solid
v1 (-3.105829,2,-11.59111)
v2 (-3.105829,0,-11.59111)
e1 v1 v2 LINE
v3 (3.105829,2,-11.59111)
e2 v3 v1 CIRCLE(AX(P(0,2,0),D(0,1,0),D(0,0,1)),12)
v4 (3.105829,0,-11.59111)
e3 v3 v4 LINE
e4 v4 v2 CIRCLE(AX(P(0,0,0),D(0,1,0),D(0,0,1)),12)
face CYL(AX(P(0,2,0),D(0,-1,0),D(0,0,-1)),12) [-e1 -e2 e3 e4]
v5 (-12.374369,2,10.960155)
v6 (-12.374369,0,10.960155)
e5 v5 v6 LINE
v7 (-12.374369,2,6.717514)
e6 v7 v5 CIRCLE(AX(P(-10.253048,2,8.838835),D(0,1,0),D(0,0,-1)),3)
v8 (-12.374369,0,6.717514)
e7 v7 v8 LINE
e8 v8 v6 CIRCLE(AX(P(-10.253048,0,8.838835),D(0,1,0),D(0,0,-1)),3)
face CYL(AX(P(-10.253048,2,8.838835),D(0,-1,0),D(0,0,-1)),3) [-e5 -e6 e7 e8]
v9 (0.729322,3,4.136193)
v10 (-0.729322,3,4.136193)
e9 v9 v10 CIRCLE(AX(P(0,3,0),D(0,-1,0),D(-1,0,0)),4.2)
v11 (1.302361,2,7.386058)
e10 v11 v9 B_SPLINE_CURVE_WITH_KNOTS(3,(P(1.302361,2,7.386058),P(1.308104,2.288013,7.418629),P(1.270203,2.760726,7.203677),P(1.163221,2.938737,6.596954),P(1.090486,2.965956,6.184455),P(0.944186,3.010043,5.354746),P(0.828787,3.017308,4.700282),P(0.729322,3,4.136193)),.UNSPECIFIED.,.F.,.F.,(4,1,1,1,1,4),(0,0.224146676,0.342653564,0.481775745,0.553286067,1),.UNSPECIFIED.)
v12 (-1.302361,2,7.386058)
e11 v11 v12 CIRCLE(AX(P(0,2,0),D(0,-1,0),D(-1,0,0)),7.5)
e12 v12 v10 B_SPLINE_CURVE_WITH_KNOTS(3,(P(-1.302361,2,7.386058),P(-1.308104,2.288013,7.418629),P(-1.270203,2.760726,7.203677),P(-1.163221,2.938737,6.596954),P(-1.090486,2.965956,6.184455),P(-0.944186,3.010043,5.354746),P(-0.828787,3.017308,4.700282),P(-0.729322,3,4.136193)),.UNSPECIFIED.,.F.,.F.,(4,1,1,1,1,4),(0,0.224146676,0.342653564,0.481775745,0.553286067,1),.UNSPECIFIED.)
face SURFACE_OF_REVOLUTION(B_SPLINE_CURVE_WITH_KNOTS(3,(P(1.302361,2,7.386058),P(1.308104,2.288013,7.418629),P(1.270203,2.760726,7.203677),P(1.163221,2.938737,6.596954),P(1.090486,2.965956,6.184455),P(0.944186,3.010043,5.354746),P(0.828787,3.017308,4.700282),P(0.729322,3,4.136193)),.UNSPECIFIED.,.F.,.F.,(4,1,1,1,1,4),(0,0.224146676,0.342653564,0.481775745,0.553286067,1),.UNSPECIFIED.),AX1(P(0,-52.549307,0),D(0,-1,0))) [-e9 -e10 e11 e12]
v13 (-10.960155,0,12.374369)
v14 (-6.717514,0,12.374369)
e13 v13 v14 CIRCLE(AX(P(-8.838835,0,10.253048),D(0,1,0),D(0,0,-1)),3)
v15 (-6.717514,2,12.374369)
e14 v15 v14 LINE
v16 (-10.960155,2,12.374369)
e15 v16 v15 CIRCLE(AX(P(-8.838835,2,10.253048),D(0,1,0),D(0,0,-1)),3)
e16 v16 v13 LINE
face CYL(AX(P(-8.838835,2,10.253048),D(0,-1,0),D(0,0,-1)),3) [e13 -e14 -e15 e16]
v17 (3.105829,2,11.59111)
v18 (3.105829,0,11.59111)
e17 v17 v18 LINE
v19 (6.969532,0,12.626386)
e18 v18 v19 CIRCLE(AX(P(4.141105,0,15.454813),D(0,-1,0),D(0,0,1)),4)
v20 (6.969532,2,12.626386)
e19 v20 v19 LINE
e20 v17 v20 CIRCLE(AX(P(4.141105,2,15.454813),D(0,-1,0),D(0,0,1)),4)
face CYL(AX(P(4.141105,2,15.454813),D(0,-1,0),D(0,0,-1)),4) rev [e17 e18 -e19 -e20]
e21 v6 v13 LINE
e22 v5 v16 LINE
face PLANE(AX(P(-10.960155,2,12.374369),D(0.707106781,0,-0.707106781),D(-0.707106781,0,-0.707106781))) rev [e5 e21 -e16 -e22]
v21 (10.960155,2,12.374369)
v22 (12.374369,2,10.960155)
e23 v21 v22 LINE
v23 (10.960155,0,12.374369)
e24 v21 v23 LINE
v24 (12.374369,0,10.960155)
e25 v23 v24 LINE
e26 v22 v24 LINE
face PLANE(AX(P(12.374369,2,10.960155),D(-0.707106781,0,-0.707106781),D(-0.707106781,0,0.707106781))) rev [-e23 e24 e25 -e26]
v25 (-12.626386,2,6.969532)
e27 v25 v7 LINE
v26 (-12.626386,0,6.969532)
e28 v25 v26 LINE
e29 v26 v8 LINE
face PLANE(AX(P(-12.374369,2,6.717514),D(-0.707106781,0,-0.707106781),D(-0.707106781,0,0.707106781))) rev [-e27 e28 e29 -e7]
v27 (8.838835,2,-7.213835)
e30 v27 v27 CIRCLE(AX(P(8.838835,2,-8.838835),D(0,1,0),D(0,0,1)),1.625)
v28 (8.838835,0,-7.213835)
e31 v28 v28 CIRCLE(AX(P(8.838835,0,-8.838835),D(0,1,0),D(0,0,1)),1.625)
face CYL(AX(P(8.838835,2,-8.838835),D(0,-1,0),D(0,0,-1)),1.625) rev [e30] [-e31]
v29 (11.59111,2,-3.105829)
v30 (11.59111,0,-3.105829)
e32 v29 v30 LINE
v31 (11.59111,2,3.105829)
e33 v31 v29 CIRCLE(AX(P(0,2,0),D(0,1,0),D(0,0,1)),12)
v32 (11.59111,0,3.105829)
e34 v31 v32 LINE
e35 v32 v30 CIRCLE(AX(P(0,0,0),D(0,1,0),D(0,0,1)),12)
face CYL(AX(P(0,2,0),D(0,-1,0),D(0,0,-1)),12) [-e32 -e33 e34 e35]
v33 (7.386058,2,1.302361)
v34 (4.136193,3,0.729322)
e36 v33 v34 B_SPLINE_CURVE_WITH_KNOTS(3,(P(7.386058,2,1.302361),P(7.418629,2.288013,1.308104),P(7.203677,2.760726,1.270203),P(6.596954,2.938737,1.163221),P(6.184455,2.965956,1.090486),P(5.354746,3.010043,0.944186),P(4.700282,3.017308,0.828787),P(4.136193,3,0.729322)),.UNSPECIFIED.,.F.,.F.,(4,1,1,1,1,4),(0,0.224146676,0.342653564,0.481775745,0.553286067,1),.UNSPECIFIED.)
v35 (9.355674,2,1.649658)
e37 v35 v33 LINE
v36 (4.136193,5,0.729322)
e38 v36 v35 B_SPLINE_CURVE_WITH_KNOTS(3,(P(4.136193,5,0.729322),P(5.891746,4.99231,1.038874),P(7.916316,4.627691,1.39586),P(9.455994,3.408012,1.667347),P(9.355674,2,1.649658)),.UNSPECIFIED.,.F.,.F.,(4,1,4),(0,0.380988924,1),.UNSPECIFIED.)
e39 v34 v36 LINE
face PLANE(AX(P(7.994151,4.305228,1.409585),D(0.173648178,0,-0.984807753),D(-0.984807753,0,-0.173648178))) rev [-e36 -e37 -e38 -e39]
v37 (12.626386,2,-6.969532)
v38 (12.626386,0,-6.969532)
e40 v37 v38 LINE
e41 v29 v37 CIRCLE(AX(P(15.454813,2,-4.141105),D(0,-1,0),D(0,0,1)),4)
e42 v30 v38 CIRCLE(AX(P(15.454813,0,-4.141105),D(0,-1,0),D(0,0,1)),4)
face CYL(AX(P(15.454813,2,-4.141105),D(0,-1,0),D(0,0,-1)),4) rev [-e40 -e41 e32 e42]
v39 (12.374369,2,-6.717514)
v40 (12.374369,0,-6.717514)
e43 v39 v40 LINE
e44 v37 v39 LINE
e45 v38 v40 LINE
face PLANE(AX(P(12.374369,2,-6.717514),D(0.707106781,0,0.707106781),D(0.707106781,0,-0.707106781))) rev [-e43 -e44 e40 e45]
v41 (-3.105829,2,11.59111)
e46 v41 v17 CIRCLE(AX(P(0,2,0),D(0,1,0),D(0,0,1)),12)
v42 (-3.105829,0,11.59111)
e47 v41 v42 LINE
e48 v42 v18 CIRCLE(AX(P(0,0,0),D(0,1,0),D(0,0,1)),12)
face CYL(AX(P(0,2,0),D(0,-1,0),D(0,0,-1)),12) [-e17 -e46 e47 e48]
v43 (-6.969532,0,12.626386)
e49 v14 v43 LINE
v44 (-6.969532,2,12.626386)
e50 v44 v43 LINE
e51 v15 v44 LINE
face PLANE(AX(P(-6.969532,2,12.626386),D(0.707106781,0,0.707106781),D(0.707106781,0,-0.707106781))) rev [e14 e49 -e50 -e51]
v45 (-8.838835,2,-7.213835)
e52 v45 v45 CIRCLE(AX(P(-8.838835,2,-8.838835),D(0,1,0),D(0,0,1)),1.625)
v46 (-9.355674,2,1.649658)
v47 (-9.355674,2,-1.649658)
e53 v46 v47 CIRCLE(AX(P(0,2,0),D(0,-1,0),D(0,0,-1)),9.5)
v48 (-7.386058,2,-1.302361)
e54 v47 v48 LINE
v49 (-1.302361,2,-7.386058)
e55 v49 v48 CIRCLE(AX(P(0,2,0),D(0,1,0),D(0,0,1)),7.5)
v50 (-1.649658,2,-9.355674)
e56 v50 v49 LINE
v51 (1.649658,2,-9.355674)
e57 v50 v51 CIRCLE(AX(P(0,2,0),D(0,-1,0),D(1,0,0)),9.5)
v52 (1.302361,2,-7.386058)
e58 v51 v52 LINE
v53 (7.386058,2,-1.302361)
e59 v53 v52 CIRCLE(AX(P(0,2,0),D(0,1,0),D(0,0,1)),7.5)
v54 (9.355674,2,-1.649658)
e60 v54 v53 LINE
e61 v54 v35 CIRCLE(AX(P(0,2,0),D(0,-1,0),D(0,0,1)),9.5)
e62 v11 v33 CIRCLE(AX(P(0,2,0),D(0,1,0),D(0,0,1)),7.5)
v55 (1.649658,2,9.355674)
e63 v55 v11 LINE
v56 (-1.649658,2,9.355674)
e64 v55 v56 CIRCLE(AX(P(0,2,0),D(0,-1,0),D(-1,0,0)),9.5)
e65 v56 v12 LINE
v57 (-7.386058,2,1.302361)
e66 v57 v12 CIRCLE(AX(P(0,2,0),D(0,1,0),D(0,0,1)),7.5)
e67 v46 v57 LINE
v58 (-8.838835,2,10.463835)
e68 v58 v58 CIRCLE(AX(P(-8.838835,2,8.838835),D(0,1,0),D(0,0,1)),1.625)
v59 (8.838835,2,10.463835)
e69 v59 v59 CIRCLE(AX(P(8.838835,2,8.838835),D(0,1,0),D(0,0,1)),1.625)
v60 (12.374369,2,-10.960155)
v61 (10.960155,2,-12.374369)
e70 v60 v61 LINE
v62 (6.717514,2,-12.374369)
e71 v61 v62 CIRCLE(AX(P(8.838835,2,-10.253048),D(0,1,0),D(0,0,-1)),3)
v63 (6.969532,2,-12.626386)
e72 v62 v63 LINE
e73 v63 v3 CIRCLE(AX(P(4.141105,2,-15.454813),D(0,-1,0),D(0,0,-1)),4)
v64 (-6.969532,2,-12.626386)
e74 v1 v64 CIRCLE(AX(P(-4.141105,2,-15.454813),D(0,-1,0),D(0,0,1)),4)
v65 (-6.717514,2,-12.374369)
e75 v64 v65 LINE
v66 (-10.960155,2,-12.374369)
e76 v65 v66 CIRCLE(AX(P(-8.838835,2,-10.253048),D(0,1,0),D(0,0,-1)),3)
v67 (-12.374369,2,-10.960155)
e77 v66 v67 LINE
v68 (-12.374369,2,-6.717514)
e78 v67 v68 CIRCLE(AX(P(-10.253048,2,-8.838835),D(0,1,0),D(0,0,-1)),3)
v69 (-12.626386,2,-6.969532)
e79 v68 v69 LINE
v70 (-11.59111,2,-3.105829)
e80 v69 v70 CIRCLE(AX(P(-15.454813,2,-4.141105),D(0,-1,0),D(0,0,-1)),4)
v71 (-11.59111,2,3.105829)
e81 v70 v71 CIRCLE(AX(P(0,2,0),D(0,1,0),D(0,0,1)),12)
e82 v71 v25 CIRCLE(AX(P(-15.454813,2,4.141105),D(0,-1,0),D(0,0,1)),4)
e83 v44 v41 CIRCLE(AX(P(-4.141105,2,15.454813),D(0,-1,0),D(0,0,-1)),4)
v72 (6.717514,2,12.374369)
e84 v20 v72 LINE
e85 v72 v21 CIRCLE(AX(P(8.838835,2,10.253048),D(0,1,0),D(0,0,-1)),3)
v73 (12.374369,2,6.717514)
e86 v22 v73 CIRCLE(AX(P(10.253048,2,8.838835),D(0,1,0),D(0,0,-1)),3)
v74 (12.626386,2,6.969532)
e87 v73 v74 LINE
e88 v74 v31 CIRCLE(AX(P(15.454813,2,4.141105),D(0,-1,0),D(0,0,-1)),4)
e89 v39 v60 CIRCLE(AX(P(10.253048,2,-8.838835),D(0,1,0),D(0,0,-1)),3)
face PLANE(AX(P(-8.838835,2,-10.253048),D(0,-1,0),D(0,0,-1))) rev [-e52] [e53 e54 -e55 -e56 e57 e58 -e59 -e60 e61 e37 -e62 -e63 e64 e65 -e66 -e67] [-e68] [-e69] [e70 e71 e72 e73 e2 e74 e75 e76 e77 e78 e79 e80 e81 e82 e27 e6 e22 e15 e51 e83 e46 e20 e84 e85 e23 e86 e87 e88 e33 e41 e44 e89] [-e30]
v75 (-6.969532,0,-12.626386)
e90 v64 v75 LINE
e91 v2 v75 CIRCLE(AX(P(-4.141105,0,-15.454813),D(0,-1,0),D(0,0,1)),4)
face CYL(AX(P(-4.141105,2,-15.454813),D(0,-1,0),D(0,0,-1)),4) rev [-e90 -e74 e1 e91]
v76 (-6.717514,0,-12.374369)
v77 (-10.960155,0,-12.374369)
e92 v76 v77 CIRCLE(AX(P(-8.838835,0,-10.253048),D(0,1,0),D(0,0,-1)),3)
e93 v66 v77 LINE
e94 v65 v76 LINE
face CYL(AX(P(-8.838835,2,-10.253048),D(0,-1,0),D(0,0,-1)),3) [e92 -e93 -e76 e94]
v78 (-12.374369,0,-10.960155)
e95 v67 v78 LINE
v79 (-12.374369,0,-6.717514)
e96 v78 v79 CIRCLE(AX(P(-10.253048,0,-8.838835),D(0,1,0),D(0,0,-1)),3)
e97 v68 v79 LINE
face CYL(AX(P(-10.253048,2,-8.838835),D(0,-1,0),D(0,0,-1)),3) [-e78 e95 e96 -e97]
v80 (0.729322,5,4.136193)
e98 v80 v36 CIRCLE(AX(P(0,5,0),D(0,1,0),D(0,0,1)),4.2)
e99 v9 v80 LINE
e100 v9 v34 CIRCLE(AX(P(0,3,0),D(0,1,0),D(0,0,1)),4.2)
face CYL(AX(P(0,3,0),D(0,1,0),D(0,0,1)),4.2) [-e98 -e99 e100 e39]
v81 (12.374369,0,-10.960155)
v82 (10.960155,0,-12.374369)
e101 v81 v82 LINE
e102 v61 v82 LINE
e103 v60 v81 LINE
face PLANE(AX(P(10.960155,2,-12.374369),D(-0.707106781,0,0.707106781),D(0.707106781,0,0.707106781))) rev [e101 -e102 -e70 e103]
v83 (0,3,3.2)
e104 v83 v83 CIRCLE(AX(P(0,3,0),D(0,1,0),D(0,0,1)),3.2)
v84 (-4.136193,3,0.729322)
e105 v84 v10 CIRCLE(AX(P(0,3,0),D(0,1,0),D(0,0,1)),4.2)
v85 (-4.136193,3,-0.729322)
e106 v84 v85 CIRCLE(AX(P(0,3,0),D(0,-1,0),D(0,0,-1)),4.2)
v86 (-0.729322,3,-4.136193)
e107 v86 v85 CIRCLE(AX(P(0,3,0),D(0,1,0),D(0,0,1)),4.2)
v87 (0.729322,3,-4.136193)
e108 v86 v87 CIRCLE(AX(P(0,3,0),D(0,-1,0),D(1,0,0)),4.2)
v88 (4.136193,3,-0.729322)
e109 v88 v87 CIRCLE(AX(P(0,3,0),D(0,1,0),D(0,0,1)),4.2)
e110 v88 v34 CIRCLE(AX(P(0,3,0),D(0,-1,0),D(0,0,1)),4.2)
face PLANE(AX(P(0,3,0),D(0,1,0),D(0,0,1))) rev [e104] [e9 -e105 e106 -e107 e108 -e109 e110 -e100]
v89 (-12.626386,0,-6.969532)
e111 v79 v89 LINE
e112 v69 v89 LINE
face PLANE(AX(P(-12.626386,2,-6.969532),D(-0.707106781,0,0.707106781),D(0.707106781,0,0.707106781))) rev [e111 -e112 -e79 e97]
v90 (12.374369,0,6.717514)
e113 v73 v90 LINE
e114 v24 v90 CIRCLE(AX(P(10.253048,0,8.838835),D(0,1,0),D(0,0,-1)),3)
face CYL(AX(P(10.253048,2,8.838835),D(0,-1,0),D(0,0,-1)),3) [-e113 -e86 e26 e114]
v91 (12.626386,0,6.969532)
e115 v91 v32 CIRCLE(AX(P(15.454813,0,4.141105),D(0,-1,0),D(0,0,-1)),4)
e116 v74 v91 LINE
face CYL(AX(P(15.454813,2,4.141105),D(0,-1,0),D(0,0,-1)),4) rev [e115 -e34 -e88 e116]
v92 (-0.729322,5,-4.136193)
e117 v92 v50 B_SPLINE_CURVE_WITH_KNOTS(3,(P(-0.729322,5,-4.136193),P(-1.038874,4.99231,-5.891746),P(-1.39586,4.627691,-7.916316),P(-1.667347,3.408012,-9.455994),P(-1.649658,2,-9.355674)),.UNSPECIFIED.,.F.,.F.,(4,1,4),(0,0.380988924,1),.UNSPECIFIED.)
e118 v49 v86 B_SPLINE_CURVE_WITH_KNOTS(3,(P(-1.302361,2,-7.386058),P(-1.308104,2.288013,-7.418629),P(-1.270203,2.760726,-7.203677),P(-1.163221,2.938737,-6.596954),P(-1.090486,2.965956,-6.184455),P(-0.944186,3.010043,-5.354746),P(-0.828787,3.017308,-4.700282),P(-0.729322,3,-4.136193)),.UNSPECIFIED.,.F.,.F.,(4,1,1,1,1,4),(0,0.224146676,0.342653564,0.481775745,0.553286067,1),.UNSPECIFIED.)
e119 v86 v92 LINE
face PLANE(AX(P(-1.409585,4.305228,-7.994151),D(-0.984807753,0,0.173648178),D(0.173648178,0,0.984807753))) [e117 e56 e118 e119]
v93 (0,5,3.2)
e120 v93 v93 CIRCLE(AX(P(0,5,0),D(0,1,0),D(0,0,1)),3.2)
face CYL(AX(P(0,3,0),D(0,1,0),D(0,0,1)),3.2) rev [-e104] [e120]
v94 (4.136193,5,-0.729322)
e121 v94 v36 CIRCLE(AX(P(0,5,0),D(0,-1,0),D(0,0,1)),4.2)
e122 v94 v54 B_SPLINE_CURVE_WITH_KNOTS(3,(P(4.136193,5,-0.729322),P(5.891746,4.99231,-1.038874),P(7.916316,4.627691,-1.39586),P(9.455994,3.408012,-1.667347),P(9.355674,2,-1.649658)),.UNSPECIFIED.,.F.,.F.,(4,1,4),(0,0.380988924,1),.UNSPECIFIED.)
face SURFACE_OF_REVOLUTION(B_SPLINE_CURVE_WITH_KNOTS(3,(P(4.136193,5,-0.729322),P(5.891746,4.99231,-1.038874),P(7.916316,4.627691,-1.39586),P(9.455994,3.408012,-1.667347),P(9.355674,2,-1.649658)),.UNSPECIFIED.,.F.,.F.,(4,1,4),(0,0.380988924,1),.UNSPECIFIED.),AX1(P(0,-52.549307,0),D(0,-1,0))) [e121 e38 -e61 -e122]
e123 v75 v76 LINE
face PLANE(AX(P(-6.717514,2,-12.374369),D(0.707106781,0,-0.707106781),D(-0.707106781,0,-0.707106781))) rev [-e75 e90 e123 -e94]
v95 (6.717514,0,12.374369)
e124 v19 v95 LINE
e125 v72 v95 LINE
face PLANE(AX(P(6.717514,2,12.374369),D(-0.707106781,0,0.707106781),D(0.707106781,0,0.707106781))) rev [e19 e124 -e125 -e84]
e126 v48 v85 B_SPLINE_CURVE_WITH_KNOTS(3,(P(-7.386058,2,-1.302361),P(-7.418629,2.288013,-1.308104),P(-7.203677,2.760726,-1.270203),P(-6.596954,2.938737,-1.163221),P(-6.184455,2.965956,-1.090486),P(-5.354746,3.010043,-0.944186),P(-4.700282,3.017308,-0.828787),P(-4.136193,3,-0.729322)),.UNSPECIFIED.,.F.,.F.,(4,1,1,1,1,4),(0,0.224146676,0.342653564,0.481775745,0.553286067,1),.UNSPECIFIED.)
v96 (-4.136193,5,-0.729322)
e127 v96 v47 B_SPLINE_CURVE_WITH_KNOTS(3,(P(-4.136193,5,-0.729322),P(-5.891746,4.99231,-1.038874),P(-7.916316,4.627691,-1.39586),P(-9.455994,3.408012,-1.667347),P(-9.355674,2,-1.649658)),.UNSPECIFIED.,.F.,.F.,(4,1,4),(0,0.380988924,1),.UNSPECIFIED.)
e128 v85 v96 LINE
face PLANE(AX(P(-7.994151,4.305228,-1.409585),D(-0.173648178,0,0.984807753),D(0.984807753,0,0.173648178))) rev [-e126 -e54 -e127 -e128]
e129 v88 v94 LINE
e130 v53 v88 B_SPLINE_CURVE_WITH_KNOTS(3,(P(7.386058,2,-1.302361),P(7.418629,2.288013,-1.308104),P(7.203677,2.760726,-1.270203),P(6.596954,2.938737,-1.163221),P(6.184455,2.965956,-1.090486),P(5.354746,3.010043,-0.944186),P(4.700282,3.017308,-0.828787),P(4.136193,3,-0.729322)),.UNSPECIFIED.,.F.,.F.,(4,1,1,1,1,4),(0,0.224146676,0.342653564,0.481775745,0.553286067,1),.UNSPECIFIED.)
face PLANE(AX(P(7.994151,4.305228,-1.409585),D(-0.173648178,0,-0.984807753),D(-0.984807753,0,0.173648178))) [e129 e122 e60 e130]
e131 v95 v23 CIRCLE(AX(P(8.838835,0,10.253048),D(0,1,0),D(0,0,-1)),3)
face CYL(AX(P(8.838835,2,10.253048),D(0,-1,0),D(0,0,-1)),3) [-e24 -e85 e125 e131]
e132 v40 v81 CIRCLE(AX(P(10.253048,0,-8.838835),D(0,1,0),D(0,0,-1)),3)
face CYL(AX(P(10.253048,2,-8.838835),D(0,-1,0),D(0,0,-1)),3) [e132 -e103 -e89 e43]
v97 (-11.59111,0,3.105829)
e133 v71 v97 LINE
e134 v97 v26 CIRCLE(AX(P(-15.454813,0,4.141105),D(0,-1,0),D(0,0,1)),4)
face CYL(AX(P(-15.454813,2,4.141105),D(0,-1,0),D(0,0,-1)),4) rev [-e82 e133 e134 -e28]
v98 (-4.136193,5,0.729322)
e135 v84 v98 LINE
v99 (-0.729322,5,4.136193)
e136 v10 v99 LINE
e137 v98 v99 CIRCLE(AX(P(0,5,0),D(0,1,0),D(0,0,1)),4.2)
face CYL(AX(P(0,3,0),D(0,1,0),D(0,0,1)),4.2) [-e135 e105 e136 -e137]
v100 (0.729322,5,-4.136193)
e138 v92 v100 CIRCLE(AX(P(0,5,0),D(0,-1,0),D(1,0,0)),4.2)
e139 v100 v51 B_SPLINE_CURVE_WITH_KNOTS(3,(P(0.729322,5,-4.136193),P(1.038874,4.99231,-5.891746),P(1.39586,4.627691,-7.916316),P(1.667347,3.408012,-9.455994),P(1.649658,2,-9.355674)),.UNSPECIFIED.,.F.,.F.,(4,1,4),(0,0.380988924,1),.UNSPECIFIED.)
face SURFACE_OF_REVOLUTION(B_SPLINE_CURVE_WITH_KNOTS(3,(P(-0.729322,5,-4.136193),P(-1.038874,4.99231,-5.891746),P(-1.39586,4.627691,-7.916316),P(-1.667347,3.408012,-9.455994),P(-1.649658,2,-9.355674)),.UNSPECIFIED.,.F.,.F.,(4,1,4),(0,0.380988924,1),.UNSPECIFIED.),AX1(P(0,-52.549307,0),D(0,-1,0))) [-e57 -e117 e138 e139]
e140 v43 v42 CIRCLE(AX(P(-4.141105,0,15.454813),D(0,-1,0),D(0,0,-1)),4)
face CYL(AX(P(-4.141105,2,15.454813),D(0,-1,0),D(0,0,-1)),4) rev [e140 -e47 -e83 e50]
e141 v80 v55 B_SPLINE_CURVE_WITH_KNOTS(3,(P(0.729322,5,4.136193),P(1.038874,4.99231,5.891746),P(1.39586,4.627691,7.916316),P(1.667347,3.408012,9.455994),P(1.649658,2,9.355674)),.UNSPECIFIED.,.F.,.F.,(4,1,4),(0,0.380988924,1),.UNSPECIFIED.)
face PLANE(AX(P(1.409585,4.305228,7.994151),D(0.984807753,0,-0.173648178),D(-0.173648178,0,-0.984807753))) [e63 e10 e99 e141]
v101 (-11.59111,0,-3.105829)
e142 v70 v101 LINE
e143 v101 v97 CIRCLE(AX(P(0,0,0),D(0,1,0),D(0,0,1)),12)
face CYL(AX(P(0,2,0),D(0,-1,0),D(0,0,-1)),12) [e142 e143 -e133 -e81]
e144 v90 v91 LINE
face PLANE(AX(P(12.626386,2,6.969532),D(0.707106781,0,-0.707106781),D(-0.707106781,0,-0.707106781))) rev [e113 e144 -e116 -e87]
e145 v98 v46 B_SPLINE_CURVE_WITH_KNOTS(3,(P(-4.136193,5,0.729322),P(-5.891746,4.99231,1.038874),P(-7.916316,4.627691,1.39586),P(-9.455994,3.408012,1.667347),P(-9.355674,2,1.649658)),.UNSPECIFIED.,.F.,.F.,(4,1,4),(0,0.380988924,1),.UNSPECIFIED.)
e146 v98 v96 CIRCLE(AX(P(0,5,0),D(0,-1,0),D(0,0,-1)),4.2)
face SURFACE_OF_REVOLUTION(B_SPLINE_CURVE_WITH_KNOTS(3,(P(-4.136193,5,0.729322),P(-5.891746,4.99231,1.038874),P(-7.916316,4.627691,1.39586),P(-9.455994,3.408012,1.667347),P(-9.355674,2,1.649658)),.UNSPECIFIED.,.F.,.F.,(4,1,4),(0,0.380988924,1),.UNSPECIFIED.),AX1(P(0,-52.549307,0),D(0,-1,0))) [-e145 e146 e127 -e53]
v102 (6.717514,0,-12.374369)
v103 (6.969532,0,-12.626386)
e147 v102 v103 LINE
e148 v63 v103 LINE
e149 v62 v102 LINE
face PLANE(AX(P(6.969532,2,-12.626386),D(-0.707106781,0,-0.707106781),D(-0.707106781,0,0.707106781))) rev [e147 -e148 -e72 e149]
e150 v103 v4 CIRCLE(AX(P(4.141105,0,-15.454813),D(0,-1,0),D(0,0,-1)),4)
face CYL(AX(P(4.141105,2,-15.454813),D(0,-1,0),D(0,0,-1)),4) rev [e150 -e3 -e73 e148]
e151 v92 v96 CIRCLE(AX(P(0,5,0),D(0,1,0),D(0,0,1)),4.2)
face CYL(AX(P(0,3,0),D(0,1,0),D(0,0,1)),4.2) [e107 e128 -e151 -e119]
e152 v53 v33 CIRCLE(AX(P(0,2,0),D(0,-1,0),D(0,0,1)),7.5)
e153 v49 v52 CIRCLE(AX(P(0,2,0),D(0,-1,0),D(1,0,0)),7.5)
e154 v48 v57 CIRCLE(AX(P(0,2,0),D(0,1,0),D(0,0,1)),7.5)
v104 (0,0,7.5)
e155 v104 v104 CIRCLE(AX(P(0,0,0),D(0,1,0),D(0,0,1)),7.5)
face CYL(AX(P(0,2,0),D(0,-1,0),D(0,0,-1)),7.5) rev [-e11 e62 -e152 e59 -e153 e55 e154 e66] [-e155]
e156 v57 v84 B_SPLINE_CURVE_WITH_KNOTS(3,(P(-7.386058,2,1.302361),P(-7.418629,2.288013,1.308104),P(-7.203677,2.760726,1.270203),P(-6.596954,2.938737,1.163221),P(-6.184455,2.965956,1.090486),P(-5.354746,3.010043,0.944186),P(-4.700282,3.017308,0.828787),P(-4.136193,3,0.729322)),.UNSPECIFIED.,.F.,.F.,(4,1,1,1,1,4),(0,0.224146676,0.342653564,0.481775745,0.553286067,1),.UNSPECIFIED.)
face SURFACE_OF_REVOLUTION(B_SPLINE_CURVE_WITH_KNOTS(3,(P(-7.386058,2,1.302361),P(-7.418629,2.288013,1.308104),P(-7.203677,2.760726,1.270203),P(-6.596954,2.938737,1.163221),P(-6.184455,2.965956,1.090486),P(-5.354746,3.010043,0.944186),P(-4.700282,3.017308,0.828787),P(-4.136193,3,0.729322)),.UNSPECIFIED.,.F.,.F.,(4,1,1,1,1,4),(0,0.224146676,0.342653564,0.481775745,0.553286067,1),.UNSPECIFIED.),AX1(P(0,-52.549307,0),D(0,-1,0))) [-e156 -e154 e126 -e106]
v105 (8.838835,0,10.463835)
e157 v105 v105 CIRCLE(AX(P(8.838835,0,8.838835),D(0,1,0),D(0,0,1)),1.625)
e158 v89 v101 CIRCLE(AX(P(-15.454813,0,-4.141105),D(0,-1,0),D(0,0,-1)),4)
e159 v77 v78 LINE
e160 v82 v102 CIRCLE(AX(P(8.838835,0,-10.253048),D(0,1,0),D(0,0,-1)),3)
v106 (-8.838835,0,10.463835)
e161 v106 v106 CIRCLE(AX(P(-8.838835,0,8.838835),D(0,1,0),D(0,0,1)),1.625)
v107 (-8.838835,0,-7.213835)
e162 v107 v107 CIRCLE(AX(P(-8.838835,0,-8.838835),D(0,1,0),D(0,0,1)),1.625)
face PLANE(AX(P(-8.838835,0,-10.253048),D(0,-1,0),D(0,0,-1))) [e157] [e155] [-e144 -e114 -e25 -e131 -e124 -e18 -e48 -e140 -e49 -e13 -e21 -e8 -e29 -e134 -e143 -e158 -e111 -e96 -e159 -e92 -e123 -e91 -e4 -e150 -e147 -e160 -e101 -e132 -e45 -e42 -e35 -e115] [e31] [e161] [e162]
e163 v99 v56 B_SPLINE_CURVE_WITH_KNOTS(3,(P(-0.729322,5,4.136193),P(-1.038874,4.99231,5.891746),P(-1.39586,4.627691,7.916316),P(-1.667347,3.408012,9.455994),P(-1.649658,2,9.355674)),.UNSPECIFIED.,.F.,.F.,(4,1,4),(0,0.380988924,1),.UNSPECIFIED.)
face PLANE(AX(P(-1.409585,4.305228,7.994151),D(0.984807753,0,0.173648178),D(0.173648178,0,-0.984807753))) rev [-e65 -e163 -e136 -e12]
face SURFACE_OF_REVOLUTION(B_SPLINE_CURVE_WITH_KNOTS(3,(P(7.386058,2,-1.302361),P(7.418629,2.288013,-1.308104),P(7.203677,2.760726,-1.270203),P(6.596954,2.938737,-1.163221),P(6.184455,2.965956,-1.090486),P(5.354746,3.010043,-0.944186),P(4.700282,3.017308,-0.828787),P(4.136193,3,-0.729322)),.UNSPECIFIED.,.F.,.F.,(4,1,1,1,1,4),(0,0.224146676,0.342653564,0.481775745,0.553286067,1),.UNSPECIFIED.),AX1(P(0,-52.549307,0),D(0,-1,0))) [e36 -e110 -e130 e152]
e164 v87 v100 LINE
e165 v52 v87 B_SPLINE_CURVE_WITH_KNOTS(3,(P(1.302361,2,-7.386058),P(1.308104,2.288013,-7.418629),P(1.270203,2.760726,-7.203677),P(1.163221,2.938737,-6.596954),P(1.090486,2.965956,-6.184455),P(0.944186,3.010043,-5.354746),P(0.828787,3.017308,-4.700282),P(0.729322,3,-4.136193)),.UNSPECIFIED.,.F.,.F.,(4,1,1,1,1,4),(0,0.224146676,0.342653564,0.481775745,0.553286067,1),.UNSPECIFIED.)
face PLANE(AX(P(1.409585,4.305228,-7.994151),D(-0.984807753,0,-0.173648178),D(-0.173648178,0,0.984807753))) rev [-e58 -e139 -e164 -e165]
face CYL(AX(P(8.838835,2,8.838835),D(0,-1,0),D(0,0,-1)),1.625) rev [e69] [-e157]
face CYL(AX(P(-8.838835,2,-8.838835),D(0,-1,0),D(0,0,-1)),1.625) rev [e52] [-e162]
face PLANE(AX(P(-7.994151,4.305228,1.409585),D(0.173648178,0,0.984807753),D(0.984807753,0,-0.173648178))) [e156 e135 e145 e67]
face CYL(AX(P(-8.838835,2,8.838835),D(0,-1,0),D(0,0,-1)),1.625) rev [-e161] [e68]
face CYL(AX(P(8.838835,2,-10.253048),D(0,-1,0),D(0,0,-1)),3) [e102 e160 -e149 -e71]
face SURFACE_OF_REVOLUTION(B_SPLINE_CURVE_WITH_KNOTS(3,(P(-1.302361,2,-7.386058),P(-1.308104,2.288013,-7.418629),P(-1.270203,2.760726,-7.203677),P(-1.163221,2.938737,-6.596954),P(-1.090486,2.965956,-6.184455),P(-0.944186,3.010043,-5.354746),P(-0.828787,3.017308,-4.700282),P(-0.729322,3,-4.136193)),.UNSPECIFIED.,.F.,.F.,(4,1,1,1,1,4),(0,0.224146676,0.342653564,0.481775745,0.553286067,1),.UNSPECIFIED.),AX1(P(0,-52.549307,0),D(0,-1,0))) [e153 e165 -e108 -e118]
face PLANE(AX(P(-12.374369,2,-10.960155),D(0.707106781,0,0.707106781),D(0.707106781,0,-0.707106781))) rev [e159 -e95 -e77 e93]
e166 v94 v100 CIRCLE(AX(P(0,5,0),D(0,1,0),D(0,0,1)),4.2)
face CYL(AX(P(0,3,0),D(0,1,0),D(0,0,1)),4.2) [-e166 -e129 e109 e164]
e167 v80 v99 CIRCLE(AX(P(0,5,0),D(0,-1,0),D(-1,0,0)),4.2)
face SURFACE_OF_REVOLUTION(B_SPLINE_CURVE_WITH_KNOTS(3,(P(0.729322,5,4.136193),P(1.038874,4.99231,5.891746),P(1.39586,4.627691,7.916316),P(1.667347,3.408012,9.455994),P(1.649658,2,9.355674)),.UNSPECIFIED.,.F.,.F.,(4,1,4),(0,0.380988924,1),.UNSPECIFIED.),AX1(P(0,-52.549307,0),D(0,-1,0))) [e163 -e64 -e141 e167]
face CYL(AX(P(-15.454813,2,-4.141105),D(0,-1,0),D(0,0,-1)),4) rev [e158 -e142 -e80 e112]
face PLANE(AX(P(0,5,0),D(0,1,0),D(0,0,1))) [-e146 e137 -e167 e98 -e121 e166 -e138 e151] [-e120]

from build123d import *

# Parameters (mm, degrees)
SKETCH21_R          = 1.625
SKETCH21_R_2        = 7.5
MAIN_DEPTH          = 2
SKETCH23_R          = 4.2
SKETCH23_R_2        = 3.2
BOSS_EXTRUDE1_DEPTH = 2
REVOLVE1_START      = 2
REVOLVE1_DEPTH      = 3.0000001
REVOLVE1_2_ANGLE    = 20
REVOLVE1_3_ANGLE    = 20
CIRPATTERN1_COUNT   = 4


with BuildPart() as part:
    # Sketch21 → Main (new body)
    with BuildSketch(Plane(origin=(0, 0, 0), x_dir=(1, 0, 0), z_dir=(0, 1, 0))):
        with BuildLine():
            Line((-12.374368671, 10.960155108), (-10.960155108, 12.374368671))
            ThreePointArc((-10.960155108, 12.374368671), (-8.838834765, 13.253048327), (-6.717514421, 12.374368671))
            Line((-6.717514421, 12.374368671), (-6.969531846, 12.626386096))
            ThreePointArc((-6.969531846, 12.626386096), (-5.176380902, 11.591109915), (-3.105828541, 11.591109915))
            ThreePointArc((-3.105828541, 11.591109915), (0, 12), (3.105828541, 11.591109915))
            ThreePointArc((3.105828541, 11.591109915), (5.176380902, 11.591109915), (6.969531846, 12.626386096))
            Line((6.969531846, 12.626386096), (6.717514421, 12.374368671))
            ThreePointArc((6.717514421, 12.374368671), (8.838834765, 13.253048327), (10.960155108, 12.374368671))
            Line((10.960155108, 12.374368671), (12.374368671, 10.960155108))
            ThreePointArc((12.374368671, 10.960155108), (13.253048327, 8.838834765), (12.374368671, 6.717514421))
            Line((12.374368671, 6.717514421), (12.626386096, 6.969531846))
            ThreePointArc((12.626386096, 6.969531846), (11.591109915, 5.176380902), (11.591109915, 3.105828541))
            ThreePointArc((11.591109915, 3.105828541), (12, 0), (11.591109915, -3.105828541))
            ThreePointArc((11.591109915, -3.105828541), (11.591109915, -5.176380902), (12.626386096, -6.969531846))
            Line((12.626386096, -6.969531846), (12.374368671, -6.717514421))
            ThreePointArc((12.374368671, -6.717514421), (13.253048327, -8.838834765), (12.374368671, -10.960155108))
            Line((12.374368671, -10.960155108), (10.960155108, -12.374368671))
            ThreePointArc((10.960155108, -12.374368671), (8.838834765, -13.253048327), (6.717514421, -12.374368671))
            Line((6.717514421, -12.374368671), (6.969531846, -12.626386096))
            ThreePointArc((6.969531846, -12.626386096), (5.176380902, -11.591109915), (3.105828541, -11.591109915))
            ThreePointArc((3.105828541, -11.591109915), (0, -12), (-3.105828541, -11.591109915))
            ThreePointArc((-3.105828541, -11.591109915), (-5.176380902, -11.591109915), (-6.969531846, -12.626386096))
            Line((-6.969531846, -12.626386096), (-6.717514421, -12.374368671))
            ThreePointArc((-6.717514421, -12.374368671), (-8.838834765, -13.253048327), (-10.960155108, -12.374368671))
            Line((-10.960155108, -12.374368671), (-12.374368671, -10.960155108))
            ThreePointArc((-12.374368671, -10.960155108), (-13.253048327, -8.838834765), (-12.374368671, -6.717514421))
            Line((-12.374368671, -6.717514421), (-12.626386096, -6.969531846))
            ThreePointArc((-12.626386096, -6.969531846), (-11.591109915, -5.176380902), (-11.591109915, -3.105828541))
            ThreePointArc((-11.591109915, -3.105828541), (-12, 0), (-11.591109915, 3.105828541))
            ThreePointArc((-11.591109915, 3.105828541), (-11.591109915, 5.176380902), (-12.626386096, 6.969531846))
            Line((-12.626386096, 6.969531846), (-12.374368671, 6.717514421))
            ThreePointArc((-12.374368671, 6.717514421), (-13.253048327, 8.838834765), (-12.374368671, 10.960155108))
        make_face()
        with Locations(Location((8.838834765, 8.838834765, 0), (0, 0, 270))):
            Circle(SKETCH21_R, mode=Mode.SUBTRACT)
        with Locations(Location((8.838834765, -8.838834765, 0), (0, 0, 270))):
            Circle(SKETCH21_R, mode=Mode.SUBTRACT)
        with Locations(Location((-8.838834765, -8.838834765, 0), (0, 0, 270))):
            Circle(SKETCH21_R, mode=Mode.SUBTRACT)
        with Locations(Location((-8.838834765, 8.838834765, 0), (0, 0, 270))):
            Circle(SKETCH21_R, mode=Mode.SUBTRACT)
        with Locations(Location((0, 0, 0), (0, 0, 270))):
            Circle(SKETCH21_R_2, mode=Mode.SUBTRACT)
    extrude(amount=MAIN_DEPTH)



with BuildPart() as body_2:
    # Sketch23 → Boss-Extrude1 (new body)
    with BuildSketch(Plane(origin=(0, 5, 0), x_dir=(1, 0, 0), z_dir=(0, 1, 0))):
        with Locations(Location((0, 0, 0), (0, 0, 270))):
            Circle(SKETCH23_R)
        with Locations(Location((0, 0, 0), (0, 0, 270))):
            Circle(SKETCH23_R_2, mode=Mode.SUBTRACT)
    extrude(amount=-BOSS_EXTRUDE1_DEPTH)


with BuildPart() as part_1:
    add(part.part)

    add(body_2.part)  # Revolve1 merges body 2
    # Revolve1: read off the stored shape, not the designer's step
    # Revolve1 outline → Revolve1 (add)
    with BuildSketch(Plane(origin=(0, 0, 0), x_dir=(1, 0, 0), z_dir=(0, 1, 0)).offset(REVOLVE1_START)):
        with BuildLine():
            ThreePointArc((-7.386058148, 1.302361332), (-7.5, 0), (-7.386058148, -1.302361332))
            Line((-7.386058148, -1.302361332), (-4.136192563, -0.729322346))
            ThreePointArc((-4.136192563, -0.729322346), (-4.2, 0), (-4.136192563, 0.729322346))
            Line((-4.136192563, 0.729322346), (-7.386058148, 1.302361332))
        make_face()
    revolve1 = extrude(amount=REVOLVE1_DEPTH)

    # Revolve1 2 outline → Revolve1 2 (revolve, cut)
    with BuildSketch(Plane(origin=(0, 0, 0), x_dir=(-0.9848077530122078, 0, -0.17364817766693202), z_dir=(0.17364817766693202, 0, -0.9848077530122078))):
        with BuildLine():
            Line((7.5, 5.0000001), (4.2, 5))
            add(Edge.make_bspline(
                [(4.2, 5), (5.982635205, 4.992310164), (6.774082879, 4.851938269), (7.492555324, 4.584836693), (7.5, 4.582052306)],
                knots=[0, 0, 0, 0, 0.380988924, 0.384982373, 0.384982373, 0.384982373, 0.384982373], degree=3))
            Line((7.5, 4.582052306), (7.5, 5.0000001))
        make_face()
        with BuildLine():
            Line((5.505892852, 3), (4.2, 3))
            Line((4.2, 3), (4.2, 2))
            Line((4.2, 2), (7.5, 2))
            Line((7.5, 2), (7.5, 2.168694052))
            add(Edge.make_bspline(
                [(7.5, 2.168694052), (7.474165676, 2.402361508), (7.259227976, 2.776784864), (6.698722273, 2.938737477), (6.279860406, 2.965955752), (5.872473083, 2.987273734), (5.643353064, 2.995990887), (5.505892852, 3)],
                knots=[0.04346167, 0.04346167, 0.04346167, 0.04346167, 0.224146676, 0.342653564, 0.481775745, 0.553286067, 0.660507352, 0.660507352, 0.660507352, 0.660507352], degree=3))
        make_face()
        with BuildLine():
            add(Edge.make_bspline(
                [(5.505892852, 3), (5.070655283, 3.012693977), (4.635308795, 3.013153878), (4.2, 3)],
                knots=[0.660507352, 0.660507352, 0.660507352, 0.660507352, 1, 1, 1, 1], degree=3))
            Line((4.2, 3), (5.505892852, 3))
        make_face()
    revolve1_2 = revolve(axis=Axis((0, 0, 0), (0, 1, 0)), revolution_arc=REVOLVE1_2_ANGLE, mode=Mode.SUBTRACT)

    # Revolve1 3 outline → Revolve1 3 (revolve)
    with BuildSketch(Plane(origin=(0, 0, 0), x_dir=(-0.9848077530122078, 0, -0.17364817766693202), z_dir=(0.17364817766693202, 0, -0.9848077530122078))):
        with BuildLine():
            Line((7.5, 4.582052306), (7.5, 2.168694052))
            add(Edge.make_bspline(
                [(7.5, 2), (7.506412796, 2.055845291), (7.506214145, 2.112488071), (7.5, 2.168694052)],
                knots=[0, 0, 0, 0, 0.04346167, 0.04346167, 0.04346167, 0.04346167], degree=3))
            Line((7.5, 2), (9.5, 2))
            add(Edge.make_bspline(
                [(9.5, 2), (9.601210283, 3.398928444), (8.64652948, 4.15323827), (7.5, 4.582052306)],
                knots=[0.969922529, 0.969922529, 0.969922529, 0.969922529, 1.584940156, 1.584940156, 1.584940156, 1.584940156], degree=3))
        make_face()
    revolve1_3 = revolve(axis=Axis((0, 0, 0), (0, 1, 0)), revolution_arc=REVOLVE1_3_ANGLE)

    # CirPattern1: Revolve1, Revolve1 2, Revolve1 3 ×4 about axis
    cirpattern1_axis = Axis((0, -52.54930657, 0), (0, 1, 0))
    add([revolve1.rotate(cirpattern1_axis, i * 360 / CIRPATTERN1_COUNT) for i in range(1, CIRPATTERN1_COUNT)])
    add([revolve1_2.rotate(cirpattern1_axis, i * 360 / CIRPATTERN1_COUNT) for i in range(1, CIRPATTERN1_COUNT)], mode=Mode.SUBTRACT)
    add([revolve1_3.rotate(cirpattern1_axis, i * 360 / CIRPATTERN1_COUNT) for i in range(1, CIRPATTERN1_COUNT)])


solid = part_1.part
